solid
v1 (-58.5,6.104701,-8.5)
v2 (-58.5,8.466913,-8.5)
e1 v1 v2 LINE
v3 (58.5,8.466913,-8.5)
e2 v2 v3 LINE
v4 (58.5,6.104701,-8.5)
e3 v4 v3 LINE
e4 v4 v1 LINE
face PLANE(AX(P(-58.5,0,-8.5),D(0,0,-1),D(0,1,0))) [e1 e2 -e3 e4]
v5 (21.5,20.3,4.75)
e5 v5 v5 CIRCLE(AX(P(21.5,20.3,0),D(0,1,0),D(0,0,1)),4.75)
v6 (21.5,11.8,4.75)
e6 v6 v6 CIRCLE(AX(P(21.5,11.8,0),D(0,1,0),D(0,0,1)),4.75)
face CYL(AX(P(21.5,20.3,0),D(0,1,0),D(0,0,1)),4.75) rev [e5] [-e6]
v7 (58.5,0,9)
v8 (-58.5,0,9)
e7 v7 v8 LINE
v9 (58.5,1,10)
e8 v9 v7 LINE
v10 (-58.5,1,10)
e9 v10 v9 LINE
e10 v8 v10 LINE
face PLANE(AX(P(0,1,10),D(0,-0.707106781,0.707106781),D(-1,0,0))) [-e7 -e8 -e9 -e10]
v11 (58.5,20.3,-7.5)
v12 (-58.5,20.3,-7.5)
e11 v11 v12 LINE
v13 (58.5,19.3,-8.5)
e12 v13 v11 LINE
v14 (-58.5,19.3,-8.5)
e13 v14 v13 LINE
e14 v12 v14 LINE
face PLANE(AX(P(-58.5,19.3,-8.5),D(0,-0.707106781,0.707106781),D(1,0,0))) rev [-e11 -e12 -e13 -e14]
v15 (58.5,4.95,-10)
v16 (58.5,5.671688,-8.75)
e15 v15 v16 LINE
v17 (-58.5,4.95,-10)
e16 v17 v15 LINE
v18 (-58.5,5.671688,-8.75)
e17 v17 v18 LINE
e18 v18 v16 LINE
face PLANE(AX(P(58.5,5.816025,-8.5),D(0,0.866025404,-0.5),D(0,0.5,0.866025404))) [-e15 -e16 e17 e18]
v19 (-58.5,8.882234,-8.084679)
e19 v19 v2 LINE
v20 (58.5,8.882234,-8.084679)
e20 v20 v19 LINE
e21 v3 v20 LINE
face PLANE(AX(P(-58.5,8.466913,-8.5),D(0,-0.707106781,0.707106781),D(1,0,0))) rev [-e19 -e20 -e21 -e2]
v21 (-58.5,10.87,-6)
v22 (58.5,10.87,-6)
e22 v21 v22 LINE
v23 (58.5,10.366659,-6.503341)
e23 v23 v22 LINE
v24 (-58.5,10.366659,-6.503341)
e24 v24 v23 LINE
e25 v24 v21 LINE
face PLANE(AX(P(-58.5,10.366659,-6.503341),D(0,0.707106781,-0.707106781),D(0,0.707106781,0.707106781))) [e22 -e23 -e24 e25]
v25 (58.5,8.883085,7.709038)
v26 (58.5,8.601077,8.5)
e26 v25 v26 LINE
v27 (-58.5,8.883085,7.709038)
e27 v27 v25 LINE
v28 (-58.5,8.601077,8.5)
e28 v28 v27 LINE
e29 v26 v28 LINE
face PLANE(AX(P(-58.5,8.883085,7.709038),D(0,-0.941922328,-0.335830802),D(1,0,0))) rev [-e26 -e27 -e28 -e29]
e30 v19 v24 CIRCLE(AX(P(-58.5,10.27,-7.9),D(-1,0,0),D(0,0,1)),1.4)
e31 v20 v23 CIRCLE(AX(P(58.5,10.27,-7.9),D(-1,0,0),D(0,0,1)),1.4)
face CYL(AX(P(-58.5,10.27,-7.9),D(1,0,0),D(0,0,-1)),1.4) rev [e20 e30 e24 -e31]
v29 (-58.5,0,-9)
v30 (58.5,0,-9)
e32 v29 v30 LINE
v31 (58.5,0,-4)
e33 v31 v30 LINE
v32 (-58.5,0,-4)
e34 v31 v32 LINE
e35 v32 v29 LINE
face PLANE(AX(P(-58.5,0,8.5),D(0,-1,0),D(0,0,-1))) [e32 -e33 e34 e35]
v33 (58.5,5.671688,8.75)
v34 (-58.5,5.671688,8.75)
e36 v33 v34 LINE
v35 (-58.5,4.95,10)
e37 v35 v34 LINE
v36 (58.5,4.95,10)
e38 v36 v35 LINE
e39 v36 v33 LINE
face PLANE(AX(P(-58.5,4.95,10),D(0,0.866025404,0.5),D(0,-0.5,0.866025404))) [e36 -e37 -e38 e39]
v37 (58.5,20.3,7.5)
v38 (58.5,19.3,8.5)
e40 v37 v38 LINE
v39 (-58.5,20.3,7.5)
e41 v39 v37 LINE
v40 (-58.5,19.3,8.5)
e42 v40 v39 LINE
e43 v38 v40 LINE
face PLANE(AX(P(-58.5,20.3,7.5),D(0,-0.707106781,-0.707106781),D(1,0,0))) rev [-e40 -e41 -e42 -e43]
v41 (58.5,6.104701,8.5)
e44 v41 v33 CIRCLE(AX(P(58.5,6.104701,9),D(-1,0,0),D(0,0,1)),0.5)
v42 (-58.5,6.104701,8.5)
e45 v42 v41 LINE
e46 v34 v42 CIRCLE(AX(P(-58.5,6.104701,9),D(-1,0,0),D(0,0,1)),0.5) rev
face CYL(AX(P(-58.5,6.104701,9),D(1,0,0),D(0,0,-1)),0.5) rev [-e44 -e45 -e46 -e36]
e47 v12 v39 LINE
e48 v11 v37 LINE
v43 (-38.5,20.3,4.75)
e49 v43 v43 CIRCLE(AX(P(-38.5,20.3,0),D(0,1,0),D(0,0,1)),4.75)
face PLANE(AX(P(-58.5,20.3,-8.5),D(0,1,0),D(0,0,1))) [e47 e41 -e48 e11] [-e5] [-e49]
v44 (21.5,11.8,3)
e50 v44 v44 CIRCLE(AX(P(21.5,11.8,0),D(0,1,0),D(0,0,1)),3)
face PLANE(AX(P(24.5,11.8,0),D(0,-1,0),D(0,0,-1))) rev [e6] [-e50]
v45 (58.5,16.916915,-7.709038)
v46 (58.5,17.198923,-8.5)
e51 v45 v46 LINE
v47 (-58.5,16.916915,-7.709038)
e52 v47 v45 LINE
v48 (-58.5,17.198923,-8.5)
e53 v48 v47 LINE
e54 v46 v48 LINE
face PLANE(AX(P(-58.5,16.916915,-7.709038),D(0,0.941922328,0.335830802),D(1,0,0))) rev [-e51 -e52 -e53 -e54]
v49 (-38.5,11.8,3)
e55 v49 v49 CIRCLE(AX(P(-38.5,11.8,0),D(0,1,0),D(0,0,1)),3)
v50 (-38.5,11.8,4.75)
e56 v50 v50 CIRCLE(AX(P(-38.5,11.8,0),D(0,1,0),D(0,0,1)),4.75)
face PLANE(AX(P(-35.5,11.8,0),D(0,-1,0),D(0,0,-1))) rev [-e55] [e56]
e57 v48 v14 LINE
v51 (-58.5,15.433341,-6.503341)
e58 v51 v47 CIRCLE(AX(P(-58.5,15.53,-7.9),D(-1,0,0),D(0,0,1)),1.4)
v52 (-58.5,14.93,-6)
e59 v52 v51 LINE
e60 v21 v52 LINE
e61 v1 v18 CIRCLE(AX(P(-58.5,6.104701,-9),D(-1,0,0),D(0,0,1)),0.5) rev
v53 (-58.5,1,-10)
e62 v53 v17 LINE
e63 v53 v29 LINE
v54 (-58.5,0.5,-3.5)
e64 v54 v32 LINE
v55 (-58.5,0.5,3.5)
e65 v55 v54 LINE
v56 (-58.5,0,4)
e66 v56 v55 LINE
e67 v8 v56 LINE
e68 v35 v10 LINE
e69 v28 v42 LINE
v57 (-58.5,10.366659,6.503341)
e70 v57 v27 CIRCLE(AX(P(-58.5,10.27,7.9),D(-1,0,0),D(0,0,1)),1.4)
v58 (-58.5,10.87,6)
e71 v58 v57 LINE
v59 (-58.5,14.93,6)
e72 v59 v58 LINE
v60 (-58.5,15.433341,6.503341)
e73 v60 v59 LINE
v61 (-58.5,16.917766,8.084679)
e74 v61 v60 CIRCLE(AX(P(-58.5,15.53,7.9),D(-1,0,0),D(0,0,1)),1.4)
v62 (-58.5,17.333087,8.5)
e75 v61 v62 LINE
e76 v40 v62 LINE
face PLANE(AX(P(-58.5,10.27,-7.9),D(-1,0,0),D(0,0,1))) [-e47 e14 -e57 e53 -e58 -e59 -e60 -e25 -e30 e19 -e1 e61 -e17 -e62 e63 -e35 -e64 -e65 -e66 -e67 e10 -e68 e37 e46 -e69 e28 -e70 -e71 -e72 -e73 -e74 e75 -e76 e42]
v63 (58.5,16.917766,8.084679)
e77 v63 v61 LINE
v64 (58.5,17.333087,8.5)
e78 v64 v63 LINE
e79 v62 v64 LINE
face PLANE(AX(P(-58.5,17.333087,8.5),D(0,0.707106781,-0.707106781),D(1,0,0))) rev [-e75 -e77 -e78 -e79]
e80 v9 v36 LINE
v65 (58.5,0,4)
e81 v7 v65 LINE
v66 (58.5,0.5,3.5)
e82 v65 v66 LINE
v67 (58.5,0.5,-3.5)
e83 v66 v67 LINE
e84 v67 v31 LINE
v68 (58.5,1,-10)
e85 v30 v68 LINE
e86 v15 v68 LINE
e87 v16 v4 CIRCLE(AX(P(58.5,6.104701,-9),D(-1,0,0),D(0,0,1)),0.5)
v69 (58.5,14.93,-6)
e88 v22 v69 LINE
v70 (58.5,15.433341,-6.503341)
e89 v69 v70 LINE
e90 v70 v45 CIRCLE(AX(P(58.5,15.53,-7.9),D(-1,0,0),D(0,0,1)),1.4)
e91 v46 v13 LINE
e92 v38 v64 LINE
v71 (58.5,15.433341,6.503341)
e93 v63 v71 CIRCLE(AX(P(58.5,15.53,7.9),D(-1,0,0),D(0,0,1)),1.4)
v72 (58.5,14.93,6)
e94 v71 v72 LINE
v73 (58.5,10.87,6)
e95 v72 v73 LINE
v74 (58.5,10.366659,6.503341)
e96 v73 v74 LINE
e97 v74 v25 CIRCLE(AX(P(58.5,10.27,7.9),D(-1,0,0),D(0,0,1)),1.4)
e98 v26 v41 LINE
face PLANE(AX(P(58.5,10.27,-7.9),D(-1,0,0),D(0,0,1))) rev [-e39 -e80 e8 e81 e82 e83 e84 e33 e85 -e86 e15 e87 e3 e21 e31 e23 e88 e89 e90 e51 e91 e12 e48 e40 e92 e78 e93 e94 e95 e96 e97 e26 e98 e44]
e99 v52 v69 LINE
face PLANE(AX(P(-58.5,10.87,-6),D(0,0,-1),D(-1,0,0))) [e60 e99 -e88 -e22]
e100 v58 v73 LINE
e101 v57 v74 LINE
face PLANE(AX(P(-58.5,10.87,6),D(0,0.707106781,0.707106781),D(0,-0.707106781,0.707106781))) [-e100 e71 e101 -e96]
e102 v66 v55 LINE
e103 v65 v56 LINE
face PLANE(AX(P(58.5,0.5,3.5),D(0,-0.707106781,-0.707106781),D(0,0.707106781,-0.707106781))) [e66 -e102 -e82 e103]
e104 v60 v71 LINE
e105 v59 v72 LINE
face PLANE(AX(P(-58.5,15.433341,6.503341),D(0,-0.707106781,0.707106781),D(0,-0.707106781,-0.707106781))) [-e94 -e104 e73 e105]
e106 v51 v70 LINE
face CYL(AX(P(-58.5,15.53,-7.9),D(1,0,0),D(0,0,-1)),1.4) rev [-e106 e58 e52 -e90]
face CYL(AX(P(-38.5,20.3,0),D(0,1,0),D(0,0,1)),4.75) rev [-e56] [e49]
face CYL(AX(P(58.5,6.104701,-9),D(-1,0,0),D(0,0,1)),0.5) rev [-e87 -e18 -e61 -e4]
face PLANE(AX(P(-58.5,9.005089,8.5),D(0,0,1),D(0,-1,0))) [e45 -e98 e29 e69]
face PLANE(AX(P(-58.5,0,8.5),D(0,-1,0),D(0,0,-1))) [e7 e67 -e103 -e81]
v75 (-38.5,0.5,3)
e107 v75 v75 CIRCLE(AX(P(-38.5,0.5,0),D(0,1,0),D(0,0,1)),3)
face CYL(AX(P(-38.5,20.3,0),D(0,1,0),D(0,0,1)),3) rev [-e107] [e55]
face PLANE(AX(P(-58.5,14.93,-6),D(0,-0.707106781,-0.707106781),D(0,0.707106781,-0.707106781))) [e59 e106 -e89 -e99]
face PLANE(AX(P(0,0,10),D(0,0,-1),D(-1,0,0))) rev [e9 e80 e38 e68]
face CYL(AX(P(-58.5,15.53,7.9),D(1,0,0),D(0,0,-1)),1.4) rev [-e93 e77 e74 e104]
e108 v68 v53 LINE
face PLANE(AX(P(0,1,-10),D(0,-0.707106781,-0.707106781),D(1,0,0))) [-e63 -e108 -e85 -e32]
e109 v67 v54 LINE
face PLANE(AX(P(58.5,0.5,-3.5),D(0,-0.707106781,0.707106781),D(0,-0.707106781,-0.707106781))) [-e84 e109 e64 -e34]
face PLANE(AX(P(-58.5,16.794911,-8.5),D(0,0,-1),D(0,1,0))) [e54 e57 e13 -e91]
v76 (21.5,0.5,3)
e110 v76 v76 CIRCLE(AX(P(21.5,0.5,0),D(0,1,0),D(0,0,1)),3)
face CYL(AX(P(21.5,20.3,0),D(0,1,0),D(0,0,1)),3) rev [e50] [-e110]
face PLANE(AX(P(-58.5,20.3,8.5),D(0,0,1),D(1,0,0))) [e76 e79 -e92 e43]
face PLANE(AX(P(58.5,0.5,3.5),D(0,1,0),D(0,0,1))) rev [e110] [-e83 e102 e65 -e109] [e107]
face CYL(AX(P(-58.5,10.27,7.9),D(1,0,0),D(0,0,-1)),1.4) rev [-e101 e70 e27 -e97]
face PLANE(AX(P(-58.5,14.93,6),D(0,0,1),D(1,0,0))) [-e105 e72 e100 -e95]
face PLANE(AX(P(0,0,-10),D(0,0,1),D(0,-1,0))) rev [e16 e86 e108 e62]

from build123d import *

# Parameters (mm, degrees)
BOSS_EXTRUDE1_DEPTH = 117
SKETCH2_W           = 117
SKETCH2_H           = 5.816025404
BOSS_EXTRUDE2_DEPTH = 1.5
SKETCH3_W           = 117
SKETCH3_H           = 4.95
BOSS_EXTRUDE3_DEPTH = 1.5
SKETCH4_W           = 7
SKETCH4_H           = 0.5
CUT_EXTRUDE1_DEPTH  = 120.168326329
DRAFT1_ANGLE        = 30
DRAFT2_ANGLE        = 30
DRAFT3_ANGLE        = 45
HOLE1_D             = 6
HOLE1_DEPTH         = 20.3
HOLE1_CBORE_D       = 9.5
HOLE1_CBORE_DEPTH   = 8.5
CHAMFER1_SIZE       = 1
CHAMFER2_SIZE       = 0.404011753
CHAMFER2_SIZE_2     = 0.538175706
FILLET1_R           = 0.5


with BuildPart() as part:
    # Sketch1 → Boss-Extrude1 (new body)
    with BuildSketch(Plane(origin=(58.5, 0, 0), x_dir=(0, 0, -1), z_dir=(1, 0, 0))):
        with BuildLine():
            Line((-8.5, 0), (8.5, 0))
            Line((8.5, 0), (8.5, 9.005088936))
            ThreePointArc((8.5, 9.005088936), (7.111244718, 9.113338811), (6.503340774, 10.366659226))
            Line((6.503340774, 10.366659226), (6, 10.87))
            Line((6, 10.87), (6, 14.93))
            Line((6, 14.93), (6.503340774, 15.433340774))
            ThreePointArc((6.503340774, 15.433340774), (7.111244718, 16.686661189), (8.5, 16.794911064))
            Line((8.5, 16.794911064), (8.5, 20.3))
            Line((8.5, 20.3), (-8.5, 20.3))
            Line((-8.5, 20.3), (-8.5, 16.794911064))
            ThreePointArc((-8.5, 16.794911064), (-7.111244718, 16.686661189), (-6.503340774, 15.433340774))
            Line((-6.503340774, 15.433340774), (-6, 14.93))
            Line((-6, 14.93), (-6, 10.87))
            Line((-6, 10.87), (-6.503340774, 10.366659226))
            ThreePointArc((-6.503340774, 10.366659226), (-7.111244718, 9.113338811), (-8.5, 9.005088936))
            Line((-8.5, 9.005088936), (-8.5, 0))
        make_face()
    extrude(amount=-BOSS_EXTRUDE1_DEPTH)

    # Sketch2 → Boss-Extrude2 (add)
    with BuildSketch(Plane(origin=(0, 0, -8.5), x_dir=(-1, 0, 0), z_dir=(0, 0, -1))):
        with Locations((0, 2.908012702)):
            Rectangle(SKETCH2_W, SKETCH2_H)
    extrude(amount=BOSS_EXTRUDE2_DEPTH)

    # Sketch3 → Boss-Extrude3 (add)
    with BuildSketch(Plane.XY.offset(8.5)):
        with Locations((0, 2.475)):
            Rectangle(SKETCH3_W, SKETCH3_H)
    extrude(amount=BOSS_EXTRUDE3_DEPTH)

    # Sketch4 → Cut-Extrude1 (cut, through all)
    with BuildSketch(Plane.ZY.offset(58.5)):
        with Locations((0, 0.25)):
            Rectangle(SKETCH4_W, SKETCH4_H)
    extrude(amount=-CUT_EXTRUDE1_DEPTH, mode=Mode.SUBTRACT)

    # Draft1
    draft1_faces = [part.faces().sort_by_distance(p)[0] for p in [
        (0, 4.95, 9.25),
    ]]
    draft(draft1_faces, Plane.XY.offset(10), DRAFT1_ANGLE)

    # Draft2
    draft2_faces = [part.faces().sort_by_distance(p)[0] for p in [
        (0, 5.816025404, -9.25),
    ]]
    draft(draft2_faces, Plane(origin=(-58.5, 0, -8.5), x_dir=(0, -1, 0), z_dir=(0, 0, -1)), DRAFT2_ANGLE)

    # Draft3
    draft3_faces = [part.faces().sort_by_distance(p)[0] for p in [
        (0, 0.25, 3.5),
        (0, 0.25, -3.5),
    ]]
    draft(draft3_faces, Plane(origin=(58.5, 0.5, 3.5), x_dir=(0, 0, -1), z_dir=(0, -1, 0)), DRAFT3_ANGLE)

    # Hole1
    with Locations(Plane(origin=(0, 20.3, 0), x_dir=(-1, 0, 0), z_dir=(0, 1, 0))):
        with Locations((38.5, 0), (-21.5, 0)):
            CounterBoreHole(HOLE1_D / 2, HOLE1_CBORE_D / 2, HOLE1_CBORE_DEPTH, depth=HOLE1_DEPTH)

    # Chamfer1
    chamfer1_edges = [part.edges().sort_by_distance(p)[0] for p in [
        (0, 20.3, 8.5),
        (0, 20.3, -8.5),
        (0, 0, -10),
        (0, 0, 10),
    ]]
    chamfer(chamfer1_edges, length=CHAMFER1_SIZE)

    # Chamfer2
    # the kernel refuses this chamfer: 0.538175706, 0.404011753 mm, written as the material it takes off along each edge
    with BuildSketch(Plane(origin=(60.548293872, 9.005088936, 8.5), x_dir=(0, -0.15244489299056474, -0.9883119723048464), z_dir=(-1, 0, 0))) as chamfer2_piece_1:
        with BuildLine():
            Line((0.800315903, 0), (CHAMFER2_SIZE * 0.152444893097, CHAMFER2_SIZE * 0.988311972993))
            Line((CHAMFER2_SIZE * 0.152444893097, CHAMFER2_SIZE * 0.988311972993), (0, 0))
            ThreePointArc((0, 0), (0.41007662, 0.05837118), (0.800315903, 0))
        make_face()
    extrude(amount=121.096587744, mode=Mode.SUBTRACT)
    with BuildSketch(Plane(origin=(59.884017308, 16.794911064, 8.5), x_dir=(0, 1, 0), z_dir=(-1, 0, 0))) as chamfer2_piece_2:
        with BuildLine():
            Line((CHAMFER2_SIZE_2, 0), (0.122854653, 0.415321053))
            ThreePointArc((0.122854653, 0.415321053), (0.079061625, 0.207906373), (0, 0))
            Line((0, 0), (CHAMFER2_SIZE_2, 0))
        make_face()
    extrude(amount=119.768034616, mode=Mode.SUBTRACT)
    with BuildSketch(Plane(origin=(60.548293872, 16.794911064, -8.5), x_dir=(0, 1, 0), z_dir=(-1, 0, 0))) as chamfer2_piece_3:
        with BuildLine():
            Line((CHAMFER2_SIZE, 0), (0.122004072, -0.790961789))
            ThreePointArc((0.122004072, -0.790961789), (0.120203022, -0.396385245), (0, 0))
            Line((0, 0), (CHAMFER2_SIZE, 0))
        make_face()
    extrude(amount=121.096587744, mode=Mode.SUBTRACT)
    with BuildSketch(Plane(origin=(59.884017308, 9.005088936, -8.5), x_dir=(0, -0.28365649946208477, 0.958925956637381), z_dir=(-1, 0, 0))) as chamfer2_piece_4:
        with BuildLine():
            Line((0.433110659, 0), (CHAMFER2_SIZE_2 * 0.283656499578, -CHAMFER2_SIZE_2 * 0.958925957029))
            Line((CHAMFER2_SIZE_2 * 0.283656499578, -CHAMFER2_SIZE_2 * 0.958925957029), (0, 0))
            ThreePointArc((0, 0), (0.221793162, -0.01684025), (0.433110659, 0))
        make_face()
    extrude(amount=119.768034616, mode=Mode.SUBTRACT)

    # Fillet1
    fillet1_edges = [part.edges().sort_by_distance(p)[0] for p in [
        (0, 5.816025404, -8.5),
        (0, 5.816025404, 8.5),
    ]]
    fillet(fillet1_edges, radius=FILLET1_R)


solid = part.part
